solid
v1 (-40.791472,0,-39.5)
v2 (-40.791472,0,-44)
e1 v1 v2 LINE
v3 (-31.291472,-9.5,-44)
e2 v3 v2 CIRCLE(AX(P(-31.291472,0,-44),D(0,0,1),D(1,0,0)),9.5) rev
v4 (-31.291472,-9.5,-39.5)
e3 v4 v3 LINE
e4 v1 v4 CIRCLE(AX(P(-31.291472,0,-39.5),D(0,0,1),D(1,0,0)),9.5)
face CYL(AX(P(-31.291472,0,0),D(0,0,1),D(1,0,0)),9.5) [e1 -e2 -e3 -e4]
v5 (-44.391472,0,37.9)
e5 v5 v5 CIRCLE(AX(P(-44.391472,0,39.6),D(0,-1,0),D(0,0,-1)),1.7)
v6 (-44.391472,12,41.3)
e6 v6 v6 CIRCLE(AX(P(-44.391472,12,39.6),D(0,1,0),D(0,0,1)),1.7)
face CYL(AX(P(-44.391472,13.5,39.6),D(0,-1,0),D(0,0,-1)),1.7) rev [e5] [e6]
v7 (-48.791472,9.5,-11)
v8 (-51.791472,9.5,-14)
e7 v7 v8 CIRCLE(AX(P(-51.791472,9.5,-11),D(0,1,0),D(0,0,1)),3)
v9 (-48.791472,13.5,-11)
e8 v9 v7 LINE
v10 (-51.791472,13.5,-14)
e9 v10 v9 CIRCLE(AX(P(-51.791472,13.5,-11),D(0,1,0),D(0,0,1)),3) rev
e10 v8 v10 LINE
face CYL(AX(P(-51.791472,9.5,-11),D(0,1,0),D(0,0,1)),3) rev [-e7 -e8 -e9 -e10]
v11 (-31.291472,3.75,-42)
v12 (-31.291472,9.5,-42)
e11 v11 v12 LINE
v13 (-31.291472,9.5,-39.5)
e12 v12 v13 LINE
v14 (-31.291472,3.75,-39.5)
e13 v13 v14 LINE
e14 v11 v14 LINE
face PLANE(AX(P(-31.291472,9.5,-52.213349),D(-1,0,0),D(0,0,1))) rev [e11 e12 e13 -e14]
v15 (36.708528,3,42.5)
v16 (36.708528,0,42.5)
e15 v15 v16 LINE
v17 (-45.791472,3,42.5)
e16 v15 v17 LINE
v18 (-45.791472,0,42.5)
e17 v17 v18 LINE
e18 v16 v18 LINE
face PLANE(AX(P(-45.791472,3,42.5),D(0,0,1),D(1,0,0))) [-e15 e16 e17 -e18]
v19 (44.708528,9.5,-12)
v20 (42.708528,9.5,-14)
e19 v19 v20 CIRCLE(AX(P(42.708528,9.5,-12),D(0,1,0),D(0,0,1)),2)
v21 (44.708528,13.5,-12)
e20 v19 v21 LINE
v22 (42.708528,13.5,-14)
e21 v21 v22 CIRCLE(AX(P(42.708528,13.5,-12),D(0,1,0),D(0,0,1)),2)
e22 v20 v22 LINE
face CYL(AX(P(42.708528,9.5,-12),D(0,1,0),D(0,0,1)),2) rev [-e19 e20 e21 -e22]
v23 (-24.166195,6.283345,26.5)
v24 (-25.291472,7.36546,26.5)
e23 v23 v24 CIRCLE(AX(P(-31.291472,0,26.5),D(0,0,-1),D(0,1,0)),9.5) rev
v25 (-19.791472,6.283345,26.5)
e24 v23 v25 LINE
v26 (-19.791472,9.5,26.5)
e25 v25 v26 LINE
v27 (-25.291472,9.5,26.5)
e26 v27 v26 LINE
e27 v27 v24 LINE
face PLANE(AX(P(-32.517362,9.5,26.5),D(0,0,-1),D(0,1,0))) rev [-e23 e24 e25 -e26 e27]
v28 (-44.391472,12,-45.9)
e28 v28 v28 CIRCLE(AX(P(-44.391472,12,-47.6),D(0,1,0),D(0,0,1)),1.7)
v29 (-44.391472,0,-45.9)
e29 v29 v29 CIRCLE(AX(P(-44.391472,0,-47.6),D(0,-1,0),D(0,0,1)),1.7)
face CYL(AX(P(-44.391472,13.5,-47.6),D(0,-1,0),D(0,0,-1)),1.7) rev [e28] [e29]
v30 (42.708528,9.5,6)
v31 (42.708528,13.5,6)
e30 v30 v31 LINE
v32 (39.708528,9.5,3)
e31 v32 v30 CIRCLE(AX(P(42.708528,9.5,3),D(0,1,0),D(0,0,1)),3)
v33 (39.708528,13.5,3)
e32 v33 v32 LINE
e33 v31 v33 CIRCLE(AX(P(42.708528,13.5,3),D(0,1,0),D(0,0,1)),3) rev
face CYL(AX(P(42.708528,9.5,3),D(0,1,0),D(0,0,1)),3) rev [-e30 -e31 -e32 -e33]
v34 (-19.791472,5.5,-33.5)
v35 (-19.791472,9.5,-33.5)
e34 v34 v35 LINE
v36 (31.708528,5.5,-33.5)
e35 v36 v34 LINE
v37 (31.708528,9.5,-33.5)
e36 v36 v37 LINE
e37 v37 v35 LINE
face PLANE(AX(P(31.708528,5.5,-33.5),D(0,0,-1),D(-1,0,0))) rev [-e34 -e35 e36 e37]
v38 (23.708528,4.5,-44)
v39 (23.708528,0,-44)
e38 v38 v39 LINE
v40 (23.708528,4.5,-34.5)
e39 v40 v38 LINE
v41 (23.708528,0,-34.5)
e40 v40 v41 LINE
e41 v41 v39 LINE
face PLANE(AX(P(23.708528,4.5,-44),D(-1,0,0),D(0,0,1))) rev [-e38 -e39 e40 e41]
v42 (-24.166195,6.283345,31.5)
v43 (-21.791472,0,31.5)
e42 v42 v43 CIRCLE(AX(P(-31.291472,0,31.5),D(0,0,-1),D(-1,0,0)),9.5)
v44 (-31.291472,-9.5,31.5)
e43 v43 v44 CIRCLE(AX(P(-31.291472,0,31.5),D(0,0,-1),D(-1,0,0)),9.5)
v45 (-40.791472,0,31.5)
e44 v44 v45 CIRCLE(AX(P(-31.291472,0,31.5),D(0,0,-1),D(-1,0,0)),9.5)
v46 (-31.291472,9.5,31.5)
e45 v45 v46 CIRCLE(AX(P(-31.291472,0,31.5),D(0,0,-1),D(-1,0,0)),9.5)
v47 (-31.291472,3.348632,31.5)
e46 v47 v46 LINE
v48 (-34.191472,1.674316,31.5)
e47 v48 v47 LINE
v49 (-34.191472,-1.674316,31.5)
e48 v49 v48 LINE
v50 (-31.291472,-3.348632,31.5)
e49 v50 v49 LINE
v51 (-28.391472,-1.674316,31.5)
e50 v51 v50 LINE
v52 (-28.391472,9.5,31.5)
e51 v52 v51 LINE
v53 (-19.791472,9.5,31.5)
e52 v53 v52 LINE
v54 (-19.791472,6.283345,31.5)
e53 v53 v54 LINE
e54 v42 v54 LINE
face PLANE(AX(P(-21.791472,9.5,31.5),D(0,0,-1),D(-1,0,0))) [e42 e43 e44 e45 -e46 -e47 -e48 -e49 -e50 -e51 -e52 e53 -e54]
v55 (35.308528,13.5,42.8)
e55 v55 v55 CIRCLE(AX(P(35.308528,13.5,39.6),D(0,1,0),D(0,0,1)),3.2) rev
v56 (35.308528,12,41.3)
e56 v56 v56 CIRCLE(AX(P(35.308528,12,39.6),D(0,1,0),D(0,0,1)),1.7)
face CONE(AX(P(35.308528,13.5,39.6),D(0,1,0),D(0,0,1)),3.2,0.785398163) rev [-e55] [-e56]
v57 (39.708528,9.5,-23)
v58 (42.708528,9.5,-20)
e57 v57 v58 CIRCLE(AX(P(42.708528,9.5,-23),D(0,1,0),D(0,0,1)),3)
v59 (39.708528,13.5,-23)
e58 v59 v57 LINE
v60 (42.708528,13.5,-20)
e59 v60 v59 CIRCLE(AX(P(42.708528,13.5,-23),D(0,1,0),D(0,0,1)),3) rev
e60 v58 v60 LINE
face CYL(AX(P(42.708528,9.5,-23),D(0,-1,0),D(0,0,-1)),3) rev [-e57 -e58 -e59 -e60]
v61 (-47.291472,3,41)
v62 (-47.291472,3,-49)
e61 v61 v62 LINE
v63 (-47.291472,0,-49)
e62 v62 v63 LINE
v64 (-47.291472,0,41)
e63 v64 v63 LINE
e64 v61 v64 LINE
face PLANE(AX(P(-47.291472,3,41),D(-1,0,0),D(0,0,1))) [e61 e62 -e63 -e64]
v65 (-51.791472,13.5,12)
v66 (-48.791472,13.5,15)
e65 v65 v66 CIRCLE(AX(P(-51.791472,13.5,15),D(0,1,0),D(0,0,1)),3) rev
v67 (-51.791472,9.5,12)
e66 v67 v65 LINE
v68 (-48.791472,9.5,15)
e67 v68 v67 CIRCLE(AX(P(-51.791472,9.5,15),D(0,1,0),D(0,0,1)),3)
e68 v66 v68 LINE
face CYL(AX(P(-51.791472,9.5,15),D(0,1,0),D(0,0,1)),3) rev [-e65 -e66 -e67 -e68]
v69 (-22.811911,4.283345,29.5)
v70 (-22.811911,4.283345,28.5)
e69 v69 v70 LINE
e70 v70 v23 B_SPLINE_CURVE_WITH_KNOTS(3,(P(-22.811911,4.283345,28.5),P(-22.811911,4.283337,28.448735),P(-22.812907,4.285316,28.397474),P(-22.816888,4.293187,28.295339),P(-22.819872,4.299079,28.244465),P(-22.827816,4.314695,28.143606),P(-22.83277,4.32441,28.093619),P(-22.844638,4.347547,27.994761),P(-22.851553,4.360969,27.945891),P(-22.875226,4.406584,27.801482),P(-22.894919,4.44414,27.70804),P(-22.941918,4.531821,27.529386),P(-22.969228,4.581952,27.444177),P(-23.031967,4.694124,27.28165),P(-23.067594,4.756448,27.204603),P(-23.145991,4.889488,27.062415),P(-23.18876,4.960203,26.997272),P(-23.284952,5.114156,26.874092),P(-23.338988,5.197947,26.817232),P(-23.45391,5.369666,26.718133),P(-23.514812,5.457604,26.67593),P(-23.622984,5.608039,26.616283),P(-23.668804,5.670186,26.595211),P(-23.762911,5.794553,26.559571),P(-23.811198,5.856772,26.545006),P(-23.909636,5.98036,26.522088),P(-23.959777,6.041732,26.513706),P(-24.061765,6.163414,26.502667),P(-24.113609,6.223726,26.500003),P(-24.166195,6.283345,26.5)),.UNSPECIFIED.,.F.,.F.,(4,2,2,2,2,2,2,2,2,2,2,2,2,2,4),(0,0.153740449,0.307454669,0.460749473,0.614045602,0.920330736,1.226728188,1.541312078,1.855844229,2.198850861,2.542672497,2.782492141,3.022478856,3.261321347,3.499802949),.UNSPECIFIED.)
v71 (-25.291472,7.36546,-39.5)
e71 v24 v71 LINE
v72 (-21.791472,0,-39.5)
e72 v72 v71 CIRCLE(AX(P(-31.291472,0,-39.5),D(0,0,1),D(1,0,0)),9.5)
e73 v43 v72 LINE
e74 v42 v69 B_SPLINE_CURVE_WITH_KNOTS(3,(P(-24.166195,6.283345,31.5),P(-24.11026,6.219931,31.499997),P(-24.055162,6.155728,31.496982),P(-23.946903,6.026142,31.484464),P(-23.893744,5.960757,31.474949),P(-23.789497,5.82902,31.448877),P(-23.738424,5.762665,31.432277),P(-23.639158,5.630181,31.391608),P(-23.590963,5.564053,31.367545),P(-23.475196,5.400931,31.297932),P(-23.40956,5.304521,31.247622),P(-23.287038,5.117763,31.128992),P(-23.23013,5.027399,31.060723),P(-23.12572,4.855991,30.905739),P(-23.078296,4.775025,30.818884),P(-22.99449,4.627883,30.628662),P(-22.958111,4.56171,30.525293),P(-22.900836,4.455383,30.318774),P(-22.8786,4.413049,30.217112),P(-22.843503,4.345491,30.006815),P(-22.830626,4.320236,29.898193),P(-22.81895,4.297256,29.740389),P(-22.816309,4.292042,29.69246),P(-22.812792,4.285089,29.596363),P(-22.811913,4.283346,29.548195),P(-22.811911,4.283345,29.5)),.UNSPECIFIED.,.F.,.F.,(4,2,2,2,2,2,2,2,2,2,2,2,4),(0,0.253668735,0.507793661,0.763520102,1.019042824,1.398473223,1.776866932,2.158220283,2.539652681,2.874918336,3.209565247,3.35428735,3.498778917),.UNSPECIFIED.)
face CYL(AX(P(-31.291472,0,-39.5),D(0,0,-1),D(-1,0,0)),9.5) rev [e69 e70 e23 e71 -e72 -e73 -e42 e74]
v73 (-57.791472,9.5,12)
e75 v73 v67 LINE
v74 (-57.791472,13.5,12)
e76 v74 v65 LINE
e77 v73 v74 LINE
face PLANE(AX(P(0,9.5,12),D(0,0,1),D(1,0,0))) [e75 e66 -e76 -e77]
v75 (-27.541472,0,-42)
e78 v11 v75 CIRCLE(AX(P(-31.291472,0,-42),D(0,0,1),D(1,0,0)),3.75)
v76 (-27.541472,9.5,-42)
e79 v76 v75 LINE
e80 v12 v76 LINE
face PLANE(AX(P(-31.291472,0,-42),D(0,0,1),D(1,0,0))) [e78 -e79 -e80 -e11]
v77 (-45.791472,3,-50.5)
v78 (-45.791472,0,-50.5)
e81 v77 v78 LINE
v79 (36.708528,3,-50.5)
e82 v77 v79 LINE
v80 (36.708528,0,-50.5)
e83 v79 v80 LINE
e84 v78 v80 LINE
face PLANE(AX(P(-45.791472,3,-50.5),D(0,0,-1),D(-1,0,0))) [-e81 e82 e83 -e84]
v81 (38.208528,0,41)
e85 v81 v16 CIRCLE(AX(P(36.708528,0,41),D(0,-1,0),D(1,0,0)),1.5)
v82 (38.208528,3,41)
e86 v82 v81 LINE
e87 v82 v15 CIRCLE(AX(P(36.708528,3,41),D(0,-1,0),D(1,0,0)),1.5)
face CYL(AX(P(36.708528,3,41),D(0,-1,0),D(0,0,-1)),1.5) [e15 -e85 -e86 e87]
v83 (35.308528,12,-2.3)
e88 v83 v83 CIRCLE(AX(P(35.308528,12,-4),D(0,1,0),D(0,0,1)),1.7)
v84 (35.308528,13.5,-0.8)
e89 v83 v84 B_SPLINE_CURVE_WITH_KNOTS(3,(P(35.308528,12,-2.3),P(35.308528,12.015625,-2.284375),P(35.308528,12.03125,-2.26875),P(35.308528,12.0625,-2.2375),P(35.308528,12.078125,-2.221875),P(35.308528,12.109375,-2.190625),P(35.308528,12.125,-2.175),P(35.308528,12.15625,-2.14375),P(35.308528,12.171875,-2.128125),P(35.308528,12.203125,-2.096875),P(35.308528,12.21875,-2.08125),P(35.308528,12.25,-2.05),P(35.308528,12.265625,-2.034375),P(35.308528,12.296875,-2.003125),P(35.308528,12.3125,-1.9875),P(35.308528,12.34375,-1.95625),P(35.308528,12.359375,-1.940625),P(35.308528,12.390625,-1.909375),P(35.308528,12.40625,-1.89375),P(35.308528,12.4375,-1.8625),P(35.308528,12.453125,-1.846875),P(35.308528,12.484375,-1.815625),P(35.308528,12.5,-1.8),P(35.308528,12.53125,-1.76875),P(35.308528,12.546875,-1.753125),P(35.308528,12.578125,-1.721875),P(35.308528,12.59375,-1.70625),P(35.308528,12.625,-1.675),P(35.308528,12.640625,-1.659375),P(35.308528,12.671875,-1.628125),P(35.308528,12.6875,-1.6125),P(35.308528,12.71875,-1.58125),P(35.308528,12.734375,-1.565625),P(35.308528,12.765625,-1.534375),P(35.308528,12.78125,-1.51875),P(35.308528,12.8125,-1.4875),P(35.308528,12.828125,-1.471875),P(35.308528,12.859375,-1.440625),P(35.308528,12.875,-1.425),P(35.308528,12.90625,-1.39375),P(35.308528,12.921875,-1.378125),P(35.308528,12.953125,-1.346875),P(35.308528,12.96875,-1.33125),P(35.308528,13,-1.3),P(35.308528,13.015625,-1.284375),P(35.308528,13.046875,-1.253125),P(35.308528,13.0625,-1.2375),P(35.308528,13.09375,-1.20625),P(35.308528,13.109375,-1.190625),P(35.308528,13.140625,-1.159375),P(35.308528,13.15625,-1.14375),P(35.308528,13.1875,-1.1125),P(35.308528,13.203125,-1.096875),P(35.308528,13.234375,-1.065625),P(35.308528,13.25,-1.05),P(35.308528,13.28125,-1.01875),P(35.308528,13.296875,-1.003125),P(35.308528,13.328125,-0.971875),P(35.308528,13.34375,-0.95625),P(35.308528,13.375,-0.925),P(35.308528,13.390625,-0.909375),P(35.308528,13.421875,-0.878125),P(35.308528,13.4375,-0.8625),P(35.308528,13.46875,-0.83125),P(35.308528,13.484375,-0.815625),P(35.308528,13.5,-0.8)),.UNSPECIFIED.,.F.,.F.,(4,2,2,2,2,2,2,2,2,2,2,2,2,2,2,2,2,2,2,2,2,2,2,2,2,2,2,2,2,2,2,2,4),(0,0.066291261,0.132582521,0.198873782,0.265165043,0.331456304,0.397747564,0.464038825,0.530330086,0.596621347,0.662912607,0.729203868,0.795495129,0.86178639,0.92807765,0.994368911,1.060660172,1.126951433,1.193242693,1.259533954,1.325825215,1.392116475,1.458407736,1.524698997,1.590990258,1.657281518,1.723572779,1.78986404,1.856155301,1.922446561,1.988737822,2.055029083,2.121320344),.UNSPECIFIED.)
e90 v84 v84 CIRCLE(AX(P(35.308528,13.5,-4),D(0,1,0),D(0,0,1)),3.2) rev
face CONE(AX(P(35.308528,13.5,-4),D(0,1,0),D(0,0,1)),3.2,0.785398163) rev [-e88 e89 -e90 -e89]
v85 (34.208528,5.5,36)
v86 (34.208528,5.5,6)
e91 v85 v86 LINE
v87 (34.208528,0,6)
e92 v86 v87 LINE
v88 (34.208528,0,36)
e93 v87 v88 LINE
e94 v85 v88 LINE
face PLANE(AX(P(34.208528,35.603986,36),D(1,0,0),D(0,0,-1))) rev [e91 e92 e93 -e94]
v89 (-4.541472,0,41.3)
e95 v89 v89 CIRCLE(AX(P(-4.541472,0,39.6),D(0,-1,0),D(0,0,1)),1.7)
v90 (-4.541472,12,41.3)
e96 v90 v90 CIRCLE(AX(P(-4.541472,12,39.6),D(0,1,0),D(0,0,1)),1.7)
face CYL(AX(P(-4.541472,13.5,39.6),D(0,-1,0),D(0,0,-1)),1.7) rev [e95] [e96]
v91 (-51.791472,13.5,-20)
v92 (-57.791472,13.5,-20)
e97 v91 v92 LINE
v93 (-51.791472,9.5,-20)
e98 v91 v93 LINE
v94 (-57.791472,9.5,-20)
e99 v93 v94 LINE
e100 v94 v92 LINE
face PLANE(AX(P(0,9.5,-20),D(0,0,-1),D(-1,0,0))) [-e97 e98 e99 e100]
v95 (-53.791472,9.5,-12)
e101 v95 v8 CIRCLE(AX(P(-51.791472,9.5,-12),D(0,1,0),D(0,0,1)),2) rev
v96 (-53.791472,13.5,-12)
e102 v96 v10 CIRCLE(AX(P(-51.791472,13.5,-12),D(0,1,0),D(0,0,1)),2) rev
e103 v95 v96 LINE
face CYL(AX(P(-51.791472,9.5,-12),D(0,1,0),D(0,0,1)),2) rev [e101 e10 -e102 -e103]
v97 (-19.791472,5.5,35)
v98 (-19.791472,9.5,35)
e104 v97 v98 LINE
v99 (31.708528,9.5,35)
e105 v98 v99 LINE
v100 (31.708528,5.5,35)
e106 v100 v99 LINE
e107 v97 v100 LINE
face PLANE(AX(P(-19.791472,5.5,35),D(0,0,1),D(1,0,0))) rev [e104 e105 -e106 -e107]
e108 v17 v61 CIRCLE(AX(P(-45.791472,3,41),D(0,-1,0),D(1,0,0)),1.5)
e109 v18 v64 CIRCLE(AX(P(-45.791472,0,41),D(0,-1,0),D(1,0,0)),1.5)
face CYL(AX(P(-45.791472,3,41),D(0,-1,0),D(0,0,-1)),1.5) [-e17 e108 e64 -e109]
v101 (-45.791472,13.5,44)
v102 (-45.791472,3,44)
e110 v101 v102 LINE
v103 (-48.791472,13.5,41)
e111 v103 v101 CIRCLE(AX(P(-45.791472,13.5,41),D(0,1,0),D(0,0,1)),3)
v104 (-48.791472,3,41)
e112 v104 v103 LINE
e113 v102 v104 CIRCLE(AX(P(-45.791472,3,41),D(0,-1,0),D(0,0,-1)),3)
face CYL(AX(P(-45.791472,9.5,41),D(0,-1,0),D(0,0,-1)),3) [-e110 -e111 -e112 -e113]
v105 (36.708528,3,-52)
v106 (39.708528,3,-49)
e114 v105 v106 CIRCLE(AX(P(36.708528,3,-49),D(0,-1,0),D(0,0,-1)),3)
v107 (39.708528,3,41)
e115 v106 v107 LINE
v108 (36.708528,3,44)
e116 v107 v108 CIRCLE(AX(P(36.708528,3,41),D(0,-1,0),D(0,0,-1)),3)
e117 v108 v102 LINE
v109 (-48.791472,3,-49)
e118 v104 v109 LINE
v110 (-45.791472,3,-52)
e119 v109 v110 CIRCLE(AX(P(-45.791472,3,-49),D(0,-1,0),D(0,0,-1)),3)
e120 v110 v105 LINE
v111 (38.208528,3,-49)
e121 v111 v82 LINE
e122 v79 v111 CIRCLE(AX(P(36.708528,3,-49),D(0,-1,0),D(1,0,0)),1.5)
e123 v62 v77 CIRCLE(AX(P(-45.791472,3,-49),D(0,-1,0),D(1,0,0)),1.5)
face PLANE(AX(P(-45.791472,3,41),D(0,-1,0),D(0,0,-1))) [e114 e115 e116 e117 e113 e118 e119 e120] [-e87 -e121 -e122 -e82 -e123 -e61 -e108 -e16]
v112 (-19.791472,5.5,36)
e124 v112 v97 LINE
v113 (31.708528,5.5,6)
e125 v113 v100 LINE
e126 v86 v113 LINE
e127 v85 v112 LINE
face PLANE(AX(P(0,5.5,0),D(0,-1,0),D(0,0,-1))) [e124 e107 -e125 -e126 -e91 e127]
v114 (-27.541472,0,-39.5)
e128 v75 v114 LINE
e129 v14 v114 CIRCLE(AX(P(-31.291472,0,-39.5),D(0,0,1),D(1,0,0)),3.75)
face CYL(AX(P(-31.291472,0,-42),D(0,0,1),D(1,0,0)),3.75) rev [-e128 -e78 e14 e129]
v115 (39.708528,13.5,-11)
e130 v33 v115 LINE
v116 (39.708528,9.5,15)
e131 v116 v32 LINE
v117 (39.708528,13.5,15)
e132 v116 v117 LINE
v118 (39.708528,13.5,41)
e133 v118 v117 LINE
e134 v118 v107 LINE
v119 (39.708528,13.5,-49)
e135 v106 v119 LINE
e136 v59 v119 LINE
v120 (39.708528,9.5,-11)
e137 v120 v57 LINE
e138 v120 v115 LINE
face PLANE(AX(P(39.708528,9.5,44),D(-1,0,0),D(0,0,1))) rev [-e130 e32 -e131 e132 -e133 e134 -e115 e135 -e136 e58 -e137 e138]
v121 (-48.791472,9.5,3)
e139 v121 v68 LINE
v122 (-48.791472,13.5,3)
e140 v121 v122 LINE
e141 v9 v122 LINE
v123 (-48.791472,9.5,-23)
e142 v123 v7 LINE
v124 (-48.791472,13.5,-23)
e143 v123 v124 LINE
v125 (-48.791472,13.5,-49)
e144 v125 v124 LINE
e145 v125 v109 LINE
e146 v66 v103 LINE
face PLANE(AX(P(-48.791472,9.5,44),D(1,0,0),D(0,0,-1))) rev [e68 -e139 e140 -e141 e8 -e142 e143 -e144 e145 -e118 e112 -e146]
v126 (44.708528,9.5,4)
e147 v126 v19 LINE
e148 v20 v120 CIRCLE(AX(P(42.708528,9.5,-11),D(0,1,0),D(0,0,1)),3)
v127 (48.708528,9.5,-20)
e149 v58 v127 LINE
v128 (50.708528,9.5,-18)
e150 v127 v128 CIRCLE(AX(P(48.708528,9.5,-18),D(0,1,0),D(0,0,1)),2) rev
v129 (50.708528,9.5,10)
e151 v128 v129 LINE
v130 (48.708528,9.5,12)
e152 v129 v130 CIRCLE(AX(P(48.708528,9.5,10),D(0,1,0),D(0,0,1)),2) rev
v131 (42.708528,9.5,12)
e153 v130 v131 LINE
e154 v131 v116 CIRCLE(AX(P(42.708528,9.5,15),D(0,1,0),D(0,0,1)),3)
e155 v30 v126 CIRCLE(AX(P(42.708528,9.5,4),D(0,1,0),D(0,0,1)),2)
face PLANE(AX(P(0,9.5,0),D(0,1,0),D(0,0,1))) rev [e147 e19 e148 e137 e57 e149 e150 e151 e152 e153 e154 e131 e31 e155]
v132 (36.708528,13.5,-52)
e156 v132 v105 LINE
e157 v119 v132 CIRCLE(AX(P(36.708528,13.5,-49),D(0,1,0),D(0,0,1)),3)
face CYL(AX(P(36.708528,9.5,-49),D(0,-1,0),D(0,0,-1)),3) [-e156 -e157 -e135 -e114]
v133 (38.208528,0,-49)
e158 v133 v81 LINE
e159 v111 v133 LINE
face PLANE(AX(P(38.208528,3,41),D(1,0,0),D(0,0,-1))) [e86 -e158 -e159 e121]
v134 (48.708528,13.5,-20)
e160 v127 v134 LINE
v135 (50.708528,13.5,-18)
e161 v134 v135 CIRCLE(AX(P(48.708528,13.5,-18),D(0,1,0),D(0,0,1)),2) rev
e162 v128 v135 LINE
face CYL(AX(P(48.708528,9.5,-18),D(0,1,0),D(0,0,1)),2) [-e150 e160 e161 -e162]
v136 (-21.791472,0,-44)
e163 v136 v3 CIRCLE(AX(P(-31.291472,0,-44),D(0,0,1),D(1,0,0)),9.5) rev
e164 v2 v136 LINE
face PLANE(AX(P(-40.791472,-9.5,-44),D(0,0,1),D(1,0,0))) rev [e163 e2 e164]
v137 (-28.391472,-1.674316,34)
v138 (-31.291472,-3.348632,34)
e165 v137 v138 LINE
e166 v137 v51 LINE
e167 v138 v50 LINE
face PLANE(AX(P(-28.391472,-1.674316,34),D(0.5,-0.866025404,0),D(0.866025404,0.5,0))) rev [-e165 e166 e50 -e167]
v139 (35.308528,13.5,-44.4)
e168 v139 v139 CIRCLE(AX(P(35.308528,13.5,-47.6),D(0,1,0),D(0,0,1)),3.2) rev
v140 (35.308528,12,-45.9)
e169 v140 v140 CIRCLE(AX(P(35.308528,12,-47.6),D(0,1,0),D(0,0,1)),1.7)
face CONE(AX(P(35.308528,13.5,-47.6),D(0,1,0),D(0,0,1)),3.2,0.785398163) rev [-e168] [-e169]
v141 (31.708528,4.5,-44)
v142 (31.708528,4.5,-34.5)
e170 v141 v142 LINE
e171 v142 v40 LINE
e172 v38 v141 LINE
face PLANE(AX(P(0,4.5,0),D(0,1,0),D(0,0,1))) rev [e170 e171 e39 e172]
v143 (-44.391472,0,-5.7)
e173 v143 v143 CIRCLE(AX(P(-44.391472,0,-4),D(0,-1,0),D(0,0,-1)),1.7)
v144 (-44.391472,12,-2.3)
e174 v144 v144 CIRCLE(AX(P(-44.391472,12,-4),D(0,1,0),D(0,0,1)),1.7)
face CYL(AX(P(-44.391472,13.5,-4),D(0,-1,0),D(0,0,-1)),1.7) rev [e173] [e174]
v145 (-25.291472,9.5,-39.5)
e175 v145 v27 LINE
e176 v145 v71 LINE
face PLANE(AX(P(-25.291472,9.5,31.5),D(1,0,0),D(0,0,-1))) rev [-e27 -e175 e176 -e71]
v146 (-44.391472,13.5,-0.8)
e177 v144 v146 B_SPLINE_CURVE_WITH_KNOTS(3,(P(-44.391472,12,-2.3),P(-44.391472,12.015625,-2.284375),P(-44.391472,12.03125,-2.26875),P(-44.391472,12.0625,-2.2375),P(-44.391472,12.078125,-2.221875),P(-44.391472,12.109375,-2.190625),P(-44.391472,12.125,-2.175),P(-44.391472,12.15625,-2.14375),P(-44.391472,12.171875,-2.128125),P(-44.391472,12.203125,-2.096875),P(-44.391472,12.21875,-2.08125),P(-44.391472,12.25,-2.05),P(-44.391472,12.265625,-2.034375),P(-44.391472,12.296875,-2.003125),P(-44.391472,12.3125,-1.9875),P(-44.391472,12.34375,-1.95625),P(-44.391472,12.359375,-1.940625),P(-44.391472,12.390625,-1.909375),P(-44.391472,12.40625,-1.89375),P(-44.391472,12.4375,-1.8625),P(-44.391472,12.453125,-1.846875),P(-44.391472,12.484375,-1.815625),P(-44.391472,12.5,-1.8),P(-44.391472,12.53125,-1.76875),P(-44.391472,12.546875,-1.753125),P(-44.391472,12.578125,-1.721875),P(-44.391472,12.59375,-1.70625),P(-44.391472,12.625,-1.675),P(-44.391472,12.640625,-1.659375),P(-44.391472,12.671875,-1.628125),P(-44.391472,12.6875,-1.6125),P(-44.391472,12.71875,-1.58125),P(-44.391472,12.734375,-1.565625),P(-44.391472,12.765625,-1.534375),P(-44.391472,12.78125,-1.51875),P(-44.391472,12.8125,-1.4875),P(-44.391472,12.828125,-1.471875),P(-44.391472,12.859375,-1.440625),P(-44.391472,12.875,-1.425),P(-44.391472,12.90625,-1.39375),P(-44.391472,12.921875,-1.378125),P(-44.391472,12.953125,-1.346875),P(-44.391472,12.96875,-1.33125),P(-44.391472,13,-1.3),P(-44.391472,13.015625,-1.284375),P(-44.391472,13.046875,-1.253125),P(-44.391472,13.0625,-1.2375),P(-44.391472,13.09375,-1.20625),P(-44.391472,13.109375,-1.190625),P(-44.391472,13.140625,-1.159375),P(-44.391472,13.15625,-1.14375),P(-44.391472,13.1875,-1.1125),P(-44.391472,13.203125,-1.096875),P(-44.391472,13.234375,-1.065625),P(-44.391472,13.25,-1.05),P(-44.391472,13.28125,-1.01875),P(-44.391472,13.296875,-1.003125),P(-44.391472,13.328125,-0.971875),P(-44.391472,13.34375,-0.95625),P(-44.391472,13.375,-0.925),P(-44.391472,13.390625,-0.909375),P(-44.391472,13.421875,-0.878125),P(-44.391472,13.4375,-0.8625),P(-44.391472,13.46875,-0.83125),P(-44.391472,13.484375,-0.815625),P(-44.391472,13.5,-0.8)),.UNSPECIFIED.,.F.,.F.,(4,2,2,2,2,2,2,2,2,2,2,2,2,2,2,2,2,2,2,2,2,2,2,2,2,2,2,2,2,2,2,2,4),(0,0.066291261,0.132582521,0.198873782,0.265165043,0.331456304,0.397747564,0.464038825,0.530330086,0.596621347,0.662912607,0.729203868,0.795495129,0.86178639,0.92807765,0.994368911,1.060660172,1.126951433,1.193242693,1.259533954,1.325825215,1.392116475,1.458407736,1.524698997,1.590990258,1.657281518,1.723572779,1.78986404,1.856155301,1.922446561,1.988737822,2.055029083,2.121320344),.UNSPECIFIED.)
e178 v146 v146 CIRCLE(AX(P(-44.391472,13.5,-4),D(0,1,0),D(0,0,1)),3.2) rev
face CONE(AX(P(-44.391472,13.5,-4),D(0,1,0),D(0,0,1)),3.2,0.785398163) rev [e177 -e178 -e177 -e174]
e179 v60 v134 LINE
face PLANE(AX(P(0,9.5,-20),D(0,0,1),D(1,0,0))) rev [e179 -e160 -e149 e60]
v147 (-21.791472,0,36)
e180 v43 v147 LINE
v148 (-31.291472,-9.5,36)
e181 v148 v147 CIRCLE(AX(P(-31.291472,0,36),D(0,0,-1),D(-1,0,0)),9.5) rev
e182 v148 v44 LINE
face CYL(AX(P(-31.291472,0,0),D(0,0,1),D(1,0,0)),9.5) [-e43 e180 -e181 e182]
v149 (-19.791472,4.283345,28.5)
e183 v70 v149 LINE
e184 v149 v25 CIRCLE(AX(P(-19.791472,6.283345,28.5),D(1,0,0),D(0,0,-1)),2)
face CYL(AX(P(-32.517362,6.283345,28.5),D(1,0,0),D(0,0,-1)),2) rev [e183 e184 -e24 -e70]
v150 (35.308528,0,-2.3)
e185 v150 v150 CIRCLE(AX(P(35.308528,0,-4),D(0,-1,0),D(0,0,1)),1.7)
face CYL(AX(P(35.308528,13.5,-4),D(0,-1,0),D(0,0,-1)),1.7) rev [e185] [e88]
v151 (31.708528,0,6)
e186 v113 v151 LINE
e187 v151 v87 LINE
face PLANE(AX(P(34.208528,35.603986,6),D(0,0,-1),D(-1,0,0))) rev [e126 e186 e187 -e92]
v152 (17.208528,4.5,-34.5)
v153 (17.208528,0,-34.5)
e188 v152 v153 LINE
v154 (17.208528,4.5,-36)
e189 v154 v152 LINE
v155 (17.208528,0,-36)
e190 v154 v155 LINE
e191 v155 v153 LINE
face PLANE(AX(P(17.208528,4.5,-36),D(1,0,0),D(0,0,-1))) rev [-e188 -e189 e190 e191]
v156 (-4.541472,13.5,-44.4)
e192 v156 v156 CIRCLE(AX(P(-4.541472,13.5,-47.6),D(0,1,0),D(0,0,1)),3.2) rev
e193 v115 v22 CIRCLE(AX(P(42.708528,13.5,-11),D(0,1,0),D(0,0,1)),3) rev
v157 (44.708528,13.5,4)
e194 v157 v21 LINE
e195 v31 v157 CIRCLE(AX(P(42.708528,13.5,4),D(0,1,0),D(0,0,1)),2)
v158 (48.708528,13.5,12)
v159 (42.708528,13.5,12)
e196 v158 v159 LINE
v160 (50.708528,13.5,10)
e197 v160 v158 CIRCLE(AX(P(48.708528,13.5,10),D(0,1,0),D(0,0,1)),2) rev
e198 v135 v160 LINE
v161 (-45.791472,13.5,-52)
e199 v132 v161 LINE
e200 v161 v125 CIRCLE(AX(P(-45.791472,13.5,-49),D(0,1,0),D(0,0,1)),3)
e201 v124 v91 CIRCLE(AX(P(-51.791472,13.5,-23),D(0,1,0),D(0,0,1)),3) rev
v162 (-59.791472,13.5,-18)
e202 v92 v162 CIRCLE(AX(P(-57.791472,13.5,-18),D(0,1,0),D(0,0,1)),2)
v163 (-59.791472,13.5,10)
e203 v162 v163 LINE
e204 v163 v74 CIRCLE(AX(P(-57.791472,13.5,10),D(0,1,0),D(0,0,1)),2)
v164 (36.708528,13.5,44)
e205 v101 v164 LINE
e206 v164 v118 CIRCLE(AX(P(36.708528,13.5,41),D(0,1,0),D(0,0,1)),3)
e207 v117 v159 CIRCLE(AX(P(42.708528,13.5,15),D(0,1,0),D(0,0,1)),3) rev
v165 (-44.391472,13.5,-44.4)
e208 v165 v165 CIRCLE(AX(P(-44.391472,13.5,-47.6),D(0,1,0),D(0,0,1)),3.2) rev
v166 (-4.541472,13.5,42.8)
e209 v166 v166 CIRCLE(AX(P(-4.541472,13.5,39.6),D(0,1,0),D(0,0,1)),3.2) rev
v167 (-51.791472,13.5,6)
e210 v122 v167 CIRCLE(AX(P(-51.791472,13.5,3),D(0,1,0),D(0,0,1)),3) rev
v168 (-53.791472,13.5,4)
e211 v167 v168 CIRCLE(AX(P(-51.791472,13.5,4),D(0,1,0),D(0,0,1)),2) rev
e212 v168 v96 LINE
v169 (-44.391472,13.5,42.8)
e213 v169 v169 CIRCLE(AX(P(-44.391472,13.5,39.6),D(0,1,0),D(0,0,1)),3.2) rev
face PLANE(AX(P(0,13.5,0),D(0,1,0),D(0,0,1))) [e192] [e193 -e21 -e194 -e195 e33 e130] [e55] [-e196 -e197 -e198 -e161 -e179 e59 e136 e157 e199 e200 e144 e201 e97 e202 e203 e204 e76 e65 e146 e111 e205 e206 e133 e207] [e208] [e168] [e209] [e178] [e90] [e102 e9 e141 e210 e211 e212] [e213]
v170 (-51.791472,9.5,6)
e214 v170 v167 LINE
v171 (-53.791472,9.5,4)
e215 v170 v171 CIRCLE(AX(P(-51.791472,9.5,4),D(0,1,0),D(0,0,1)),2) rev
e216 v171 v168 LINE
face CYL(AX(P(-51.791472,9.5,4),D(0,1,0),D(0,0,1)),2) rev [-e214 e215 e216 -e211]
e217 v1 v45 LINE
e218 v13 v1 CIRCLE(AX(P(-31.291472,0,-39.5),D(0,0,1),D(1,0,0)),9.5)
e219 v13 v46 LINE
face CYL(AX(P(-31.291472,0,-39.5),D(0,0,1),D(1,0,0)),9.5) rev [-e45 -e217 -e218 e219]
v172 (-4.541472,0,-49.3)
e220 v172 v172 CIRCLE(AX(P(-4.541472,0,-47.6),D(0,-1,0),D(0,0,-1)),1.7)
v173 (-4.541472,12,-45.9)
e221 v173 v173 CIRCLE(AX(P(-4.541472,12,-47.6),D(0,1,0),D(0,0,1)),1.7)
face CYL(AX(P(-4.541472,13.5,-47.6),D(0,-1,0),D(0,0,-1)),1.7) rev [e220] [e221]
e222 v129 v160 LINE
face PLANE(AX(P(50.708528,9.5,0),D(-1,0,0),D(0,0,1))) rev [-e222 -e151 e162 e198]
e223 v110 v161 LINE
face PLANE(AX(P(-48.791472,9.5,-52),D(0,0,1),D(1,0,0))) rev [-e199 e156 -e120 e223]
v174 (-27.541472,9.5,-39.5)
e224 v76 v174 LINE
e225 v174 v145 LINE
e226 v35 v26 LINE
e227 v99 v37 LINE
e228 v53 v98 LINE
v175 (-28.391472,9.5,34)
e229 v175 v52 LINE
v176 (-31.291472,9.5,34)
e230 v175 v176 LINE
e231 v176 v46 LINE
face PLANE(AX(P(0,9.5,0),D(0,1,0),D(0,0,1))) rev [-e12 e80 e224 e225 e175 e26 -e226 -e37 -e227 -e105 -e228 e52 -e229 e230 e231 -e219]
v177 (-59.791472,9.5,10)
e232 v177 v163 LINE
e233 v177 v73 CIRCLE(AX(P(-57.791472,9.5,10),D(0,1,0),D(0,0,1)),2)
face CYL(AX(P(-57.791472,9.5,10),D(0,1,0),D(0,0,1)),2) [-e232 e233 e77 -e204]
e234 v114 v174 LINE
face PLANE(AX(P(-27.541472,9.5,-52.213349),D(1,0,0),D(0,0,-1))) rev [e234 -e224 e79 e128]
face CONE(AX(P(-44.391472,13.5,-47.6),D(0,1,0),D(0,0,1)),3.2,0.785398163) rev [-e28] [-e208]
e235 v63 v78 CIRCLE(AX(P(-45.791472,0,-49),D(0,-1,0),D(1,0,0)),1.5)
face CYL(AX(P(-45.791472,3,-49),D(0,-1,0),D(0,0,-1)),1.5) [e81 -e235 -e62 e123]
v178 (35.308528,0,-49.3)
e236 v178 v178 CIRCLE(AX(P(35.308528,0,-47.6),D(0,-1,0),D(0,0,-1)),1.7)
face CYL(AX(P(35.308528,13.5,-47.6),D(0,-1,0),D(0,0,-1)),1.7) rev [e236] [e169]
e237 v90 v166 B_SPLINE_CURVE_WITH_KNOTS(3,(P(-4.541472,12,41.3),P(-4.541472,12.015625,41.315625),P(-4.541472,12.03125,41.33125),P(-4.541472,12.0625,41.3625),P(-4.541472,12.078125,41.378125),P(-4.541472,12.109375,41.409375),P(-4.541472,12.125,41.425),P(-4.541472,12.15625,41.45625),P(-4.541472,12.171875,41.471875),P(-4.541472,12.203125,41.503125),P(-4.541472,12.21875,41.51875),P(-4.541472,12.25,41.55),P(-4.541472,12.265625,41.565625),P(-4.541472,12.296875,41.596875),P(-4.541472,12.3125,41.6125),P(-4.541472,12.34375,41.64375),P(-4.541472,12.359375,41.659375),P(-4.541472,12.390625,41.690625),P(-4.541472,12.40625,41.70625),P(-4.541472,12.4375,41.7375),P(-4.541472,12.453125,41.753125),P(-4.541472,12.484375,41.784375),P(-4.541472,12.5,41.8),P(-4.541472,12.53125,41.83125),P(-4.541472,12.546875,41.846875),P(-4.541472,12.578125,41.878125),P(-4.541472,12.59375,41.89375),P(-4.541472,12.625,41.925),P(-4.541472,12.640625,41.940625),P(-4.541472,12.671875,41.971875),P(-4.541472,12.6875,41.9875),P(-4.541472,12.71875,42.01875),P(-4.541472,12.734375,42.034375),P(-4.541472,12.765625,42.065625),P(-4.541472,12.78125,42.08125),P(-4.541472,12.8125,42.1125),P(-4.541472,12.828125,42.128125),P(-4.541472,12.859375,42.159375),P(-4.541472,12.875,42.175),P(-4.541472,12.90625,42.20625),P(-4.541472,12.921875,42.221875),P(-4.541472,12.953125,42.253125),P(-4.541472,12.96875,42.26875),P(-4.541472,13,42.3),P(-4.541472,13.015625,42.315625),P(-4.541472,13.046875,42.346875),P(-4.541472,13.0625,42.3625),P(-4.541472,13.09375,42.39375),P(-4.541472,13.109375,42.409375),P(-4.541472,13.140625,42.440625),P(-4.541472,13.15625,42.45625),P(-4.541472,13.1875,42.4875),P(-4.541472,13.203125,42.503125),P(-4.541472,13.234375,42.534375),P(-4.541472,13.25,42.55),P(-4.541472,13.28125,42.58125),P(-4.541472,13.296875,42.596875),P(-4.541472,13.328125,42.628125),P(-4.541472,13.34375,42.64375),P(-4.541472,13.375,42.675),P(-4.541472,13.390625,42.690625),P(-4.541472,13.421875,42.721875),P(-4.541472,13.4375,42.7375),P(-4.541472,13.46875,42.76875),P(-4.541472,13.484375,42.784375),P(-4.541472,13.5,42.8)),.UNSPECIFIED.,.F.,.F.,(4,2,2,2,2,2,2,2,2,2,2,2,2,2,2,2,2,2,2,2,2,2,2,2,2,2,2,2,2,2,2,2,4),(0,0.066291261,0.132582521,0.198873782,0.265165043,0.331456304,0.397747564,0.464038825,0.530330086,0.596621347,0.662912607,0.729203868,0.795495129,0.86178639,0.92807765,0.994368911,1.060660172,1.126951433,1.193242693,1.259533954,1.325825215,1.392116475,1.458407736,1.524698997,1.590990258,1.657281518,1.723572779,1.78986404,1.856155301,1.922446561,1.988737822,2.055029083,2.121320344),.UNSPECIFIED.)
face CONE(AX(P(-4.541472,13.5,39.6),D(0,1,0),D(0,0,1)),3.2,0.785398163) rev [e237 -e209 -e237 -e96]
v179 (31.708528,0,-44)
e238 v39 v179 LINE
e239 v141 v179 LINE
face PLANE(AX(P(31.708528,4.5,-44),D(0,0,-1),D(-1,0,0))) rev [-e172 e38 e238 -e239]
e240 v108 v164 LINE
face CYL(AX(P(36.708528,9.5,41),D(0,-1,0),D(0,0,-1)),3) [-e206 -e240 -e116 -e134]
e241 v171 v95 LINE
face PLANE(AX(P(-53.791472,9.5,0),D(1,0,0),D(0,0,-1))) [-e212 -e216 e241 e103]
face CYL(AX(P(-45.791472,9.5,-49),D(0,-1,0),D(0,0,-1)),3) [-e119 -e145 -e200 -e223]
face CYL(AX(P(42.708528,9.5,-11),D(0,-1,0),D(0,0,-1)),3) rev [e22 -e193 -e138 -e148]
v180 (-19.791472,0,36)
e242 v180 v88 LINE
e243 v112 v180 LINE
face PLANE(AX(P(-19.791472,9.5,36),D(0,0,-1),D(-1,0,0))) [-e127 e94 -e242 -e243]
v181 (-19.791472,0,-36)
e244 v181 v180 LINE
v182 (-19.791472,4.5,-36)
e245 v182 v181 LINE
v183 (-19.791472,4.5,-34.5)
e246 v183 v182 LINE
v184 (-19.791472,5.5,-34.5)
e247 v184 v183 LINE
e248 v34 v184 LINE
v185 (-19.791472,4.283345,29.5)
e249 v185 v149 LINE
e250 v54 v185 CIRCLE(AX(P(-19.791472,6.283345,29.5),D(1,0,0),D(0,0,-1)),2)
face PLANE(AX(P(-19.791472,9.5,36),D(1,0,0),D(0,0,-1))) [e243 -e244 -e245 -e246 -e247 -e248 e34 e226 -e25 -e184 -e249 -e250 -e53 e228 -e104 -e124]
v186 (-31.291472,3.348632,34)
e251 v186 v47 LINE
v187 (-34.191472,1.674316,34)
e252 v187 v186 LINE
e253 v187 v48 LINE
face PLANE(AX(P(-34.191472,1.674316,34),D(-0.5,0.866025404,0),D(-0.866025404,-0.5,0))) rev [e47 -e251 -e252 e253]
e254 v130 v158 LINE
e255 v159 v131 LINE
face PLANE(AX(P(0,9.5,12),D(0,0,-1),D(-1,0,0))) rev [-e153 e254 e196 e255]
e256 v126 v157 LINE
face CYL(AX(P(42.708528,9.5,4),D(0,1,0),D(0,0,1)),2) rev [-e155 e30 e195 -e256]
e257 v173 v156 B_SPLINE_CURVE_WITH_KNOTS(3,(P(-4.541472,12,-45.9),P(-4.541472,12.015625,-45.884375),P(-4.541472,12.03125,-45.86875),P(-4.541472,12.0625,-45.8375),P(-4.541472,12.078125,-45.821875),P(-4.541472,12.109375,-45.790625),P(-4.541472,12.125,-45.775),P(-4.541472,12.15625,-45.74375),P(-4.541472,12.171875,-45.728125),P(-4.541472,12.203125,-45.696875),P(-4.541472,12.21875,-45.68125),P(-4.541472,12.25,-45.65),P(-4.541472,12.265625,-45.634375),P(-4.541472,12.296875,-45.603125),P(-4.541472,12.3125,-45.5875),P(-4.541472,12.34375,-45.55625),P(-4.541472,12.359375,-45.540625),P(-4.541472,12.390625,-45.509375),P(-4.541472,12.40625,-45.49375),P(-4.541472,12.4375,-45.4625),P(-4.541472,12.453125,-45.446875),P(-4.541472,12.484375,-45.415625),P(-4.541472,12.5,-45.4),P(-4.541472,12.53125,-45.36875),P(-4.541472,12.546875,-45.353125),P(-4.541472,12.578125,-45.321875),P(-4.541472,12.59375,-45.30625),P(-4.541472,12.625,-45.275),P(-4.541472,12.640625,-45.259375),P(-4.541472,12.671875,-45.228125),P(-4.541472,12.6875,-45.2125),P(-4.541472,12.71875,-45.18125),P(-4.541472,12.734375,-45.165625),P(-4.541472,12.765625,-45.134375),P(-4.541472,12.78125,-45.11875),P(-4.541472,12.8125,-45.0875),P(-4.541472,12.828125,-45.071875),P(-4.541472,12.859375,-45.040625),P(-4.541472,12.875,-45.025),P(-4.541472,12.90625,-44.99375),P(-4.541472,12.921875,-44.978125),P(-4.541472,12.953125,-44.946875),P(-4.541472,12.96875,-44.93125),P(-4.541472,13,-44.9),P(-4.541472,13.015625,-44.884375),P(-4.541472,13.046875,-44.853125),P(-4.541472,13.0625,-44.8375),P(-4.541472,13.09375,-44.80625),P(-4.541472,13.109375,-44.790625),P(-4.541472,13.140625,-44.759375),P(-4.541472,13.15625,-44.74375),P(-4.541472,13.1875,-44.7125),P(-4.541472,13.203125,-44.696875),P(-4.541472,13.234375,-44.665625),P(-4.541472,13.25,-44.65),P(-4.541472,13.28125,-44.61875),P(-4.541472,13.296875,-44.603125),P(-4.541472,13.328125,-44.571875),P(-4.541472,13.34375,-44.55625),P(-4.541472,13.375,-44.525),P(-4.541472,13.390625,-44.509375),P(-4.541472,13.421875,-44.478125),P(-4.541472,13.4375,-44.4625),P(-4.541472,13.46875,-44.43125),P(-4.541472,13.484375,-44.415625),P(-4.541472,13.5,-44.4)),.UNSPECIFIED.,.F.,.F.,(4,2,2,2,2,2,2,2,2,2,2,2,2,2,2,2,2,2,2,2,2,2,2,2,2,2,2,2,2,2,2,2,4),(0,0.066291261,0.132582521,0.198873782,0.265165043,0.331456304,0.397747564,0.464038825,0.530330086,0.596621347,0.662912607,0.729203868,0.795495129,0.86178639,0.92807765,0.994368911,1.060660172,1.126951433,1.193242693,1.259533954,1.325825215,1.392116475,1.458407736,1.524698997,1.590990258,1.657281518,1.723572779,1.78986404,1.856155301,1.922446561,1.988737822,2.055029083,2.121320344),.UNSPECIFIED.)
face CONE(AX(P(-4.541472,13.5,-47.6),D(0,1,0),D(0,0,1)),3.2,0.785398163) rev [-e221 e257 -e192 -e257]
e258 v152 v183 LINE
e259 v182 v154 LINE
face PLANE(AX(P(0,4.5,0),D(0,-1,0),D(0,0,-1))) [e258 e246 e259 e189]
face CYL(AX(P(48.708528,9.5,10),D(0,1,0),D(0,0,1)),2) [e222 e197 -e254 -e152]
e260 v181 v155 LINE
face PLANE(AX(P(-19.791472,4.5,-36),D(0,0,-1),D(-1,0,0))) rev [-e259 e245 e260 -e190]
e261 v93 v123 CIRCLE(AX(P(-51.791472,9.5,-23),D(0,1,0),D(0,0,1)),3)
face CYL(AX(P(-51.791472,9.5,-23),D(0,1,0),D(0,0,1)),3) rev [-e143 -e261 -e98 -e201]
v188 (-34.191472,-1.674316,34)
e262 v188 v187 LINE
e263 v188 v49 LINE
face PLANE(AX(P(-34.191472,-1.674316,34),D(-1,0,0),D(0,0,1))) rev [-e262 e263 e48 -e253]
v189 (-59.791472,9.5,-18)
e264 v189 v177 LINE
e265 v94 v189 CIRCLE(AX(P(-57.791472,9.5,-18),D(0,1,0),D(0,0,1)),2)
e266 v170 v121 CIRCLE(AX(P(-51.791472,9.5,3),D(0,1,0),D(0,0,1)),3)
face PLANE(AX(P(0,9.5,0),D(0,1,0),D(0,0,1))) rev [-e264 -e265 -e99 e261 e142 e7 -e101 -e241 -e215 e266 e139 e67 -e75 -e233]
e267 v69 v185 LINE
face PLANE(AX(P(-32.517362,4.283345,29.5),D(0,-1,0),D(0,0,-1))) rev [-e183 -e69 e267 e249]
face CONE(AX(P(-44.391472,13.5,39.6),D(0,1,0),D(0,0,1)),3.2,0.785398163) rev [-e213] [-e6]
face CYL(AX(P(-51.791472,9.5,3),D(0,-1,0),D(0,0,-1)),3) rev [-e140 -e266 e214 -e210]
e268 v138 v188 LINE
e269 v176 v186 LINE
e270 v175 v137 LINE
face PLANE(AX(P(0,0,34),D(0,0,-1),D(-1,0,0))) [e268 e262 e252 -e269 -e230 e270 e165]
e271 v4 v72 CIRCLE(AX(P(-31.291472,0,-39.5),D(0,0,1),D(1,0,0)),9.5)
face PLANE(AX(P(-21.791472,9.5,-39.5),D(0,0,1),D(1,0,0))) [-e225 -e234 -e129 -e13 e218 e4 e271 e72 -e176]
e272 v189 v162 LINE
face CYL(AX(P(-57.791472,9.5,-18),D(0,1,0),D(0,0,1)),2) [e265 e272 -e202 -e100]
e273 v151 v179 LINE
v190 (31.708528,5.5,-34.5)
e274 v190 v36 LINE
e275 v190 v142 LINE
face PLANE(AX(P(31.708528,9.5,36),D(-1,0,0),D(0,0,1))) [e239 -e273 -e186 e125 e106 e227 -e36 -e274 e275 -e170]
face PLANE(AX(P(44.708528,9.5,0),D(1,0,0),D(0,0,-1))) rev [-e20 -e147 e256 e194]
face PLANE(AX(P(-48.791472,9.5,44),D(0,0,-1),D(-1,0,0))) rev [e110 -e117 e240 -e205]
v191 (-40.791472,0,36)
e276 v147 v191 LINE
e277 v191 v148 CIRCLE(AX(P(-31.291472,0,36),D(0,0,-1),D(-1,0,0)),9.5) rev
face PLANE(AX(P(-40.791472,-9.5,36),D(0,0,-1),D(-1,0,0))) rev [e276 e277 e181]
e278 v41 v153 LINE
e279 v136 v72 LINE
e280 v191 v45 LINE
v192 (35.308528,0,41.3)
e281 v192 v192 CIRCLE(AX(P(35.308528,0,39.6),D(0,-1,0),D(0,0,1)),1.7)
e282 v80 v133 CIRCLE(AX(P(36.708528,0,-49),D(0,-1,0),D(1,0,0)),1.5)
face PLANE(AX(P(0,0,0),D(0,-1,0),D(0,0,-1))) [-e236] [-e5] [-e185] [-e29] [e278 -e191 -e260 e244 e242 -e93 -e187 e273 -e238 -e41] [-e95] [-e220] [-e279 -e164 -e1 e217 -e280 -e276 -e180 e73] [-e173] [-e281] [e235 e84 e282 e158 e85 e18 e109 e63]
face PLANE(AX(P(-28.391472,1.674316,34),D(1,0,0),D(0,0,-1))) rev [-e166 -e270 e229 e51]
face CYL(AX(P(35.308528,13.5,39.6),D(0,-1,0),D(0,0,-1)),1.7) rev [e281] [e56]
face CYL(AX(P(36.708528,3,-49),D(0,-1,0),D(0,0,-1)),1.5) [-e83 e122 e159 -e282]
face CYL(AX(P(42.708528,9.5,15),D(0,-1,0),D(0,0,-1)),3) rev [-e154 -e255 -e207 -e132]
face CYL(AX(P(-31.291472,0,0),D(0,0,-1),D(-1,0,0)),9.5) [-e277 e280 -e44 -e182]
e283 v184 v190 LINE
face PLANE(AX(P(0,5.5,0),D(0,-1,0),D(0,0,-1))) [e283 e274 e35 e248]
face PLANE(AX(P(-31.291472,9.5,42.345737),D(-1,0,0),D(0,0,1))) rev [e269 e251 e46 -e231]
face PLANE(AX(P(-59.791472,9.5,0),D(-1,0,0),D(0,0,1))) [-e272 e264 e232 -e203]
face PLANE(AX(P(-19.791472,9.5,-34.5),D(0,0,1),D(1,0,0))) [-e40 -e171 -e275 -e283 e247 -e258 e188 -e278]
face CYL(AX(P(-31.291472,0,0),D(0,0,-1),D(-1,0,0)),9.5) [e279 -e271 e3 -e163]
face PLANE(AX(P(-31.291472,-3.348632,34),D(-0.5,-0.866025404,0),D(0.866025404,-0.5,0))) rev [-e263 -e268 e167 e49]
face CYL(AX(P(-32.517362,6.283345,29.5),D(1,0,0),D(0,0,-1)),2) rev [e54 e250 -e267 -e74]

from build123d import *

# Parameters (mm, degrees)
SKETCH_1_W            = 88.5
SKETCH_1_H            = 96
SKETCH_1_W_2          = 51.5
SKETCH_1_H_2          = 70.5
SKETCH_1_W_3          = 19
SKETCH_1_H_3          = 71
EXTRUDE_1_DEPTH       = 9.5
SKETCH_5_W            = 88.5
SKETCH_5_H            = 96
EXTRUDE_4_DEPTH       = 4
SKETCH_6_W            = 51.5
SKETCH_6_H            = 1
EXTRUDE_6_DEPTH       = 4
FILLET_3_R            = 9.5
SKETCH_7_W            = 8
SKETCH_7_H            = 9.5
SKETCH_7_W_2          = 37
SKETCH_7_H_2          = 1.5
CUT_EXTRUDE_1_DEPTH   = 4.5
SKETCH_8_W            = 2.5
SKETCH_8_H            = 30
CUT_EXTRUDE_2_DEPTH   = 5.5
SKETCH_9_W            = 19
SKETCH_9_H            = 4.5
EXTRUDE_7_DEPTH       = 9.5
FILLET_4_R            = 9.5
CUT_EXTRUDE_3_DEPTH   = 2.5
SKETCH_11_R           = 3.75
CUT_EXTRUDE_4_DEPTH   = 2.5
SKETCH_13_R           = 1.7
CUT_EXTRUDE_5_DEPTH   = 73.573120111
SKETCH_14_R           = 1.7
CUT_EXTRUDE_6_DEPTH   = 73.573120111
CHAMFER_1_SIZE        = 1.5
SKETCH_15_W           = 6
SKETCH_15_H           = 71
CUT_EXTRUDE_7_DEPTH   = 9.5
CUT_EXTRUDE_9_REACH   = 82.165
SKETCH_18_W           = 2.9
SKETCH_18_H           = 7.825684219
CUT_EXTRUDE_10_DEPTH  = 2.5
SKETCH_19_W           = 3.75
SKETCH_19_H           = 9.5
CUT_EXTRUDE_11_DEPTH  = 2.5
FILLET_5_R            = 3
CUT_EXTRUDE_2_2_DEPTH = 3
EXTRUDE_8_DEPTH       = 4
FILLET_6_R            = 3


with BuildPart() as part:
    # Эскиз1 → Бобышка-Вытянуть1 (new body)
    with BuildSketch(Plane(origin=(0, 0, 0), x_dir=(1, 0, 0), z_dir=(0, 1, 0))):
        with Locations((-4.541472233, 4)):
            Rectangle(SKETCH_1_W, SKETCH_1_H)
        with Locations((5.958527767, -0.75)):
            Rectangle(SKETCH_1_W_2, SKETCH_1_H_2, mode=Mode.SUBTRACT)
        with Locations((-31.291472233, 4)):
            Rectangle(SKETCH_1_W_3, SKETCH_1_H_3, mode=Mode.SUBTRACT)
    extrude(amount=EXTRUDE_1_DEPTH)

    # Эскиз5 → Бобышка-Вытянуть4 (add)
    with BuildSketch(Plane(origin=(0, 9.5, 0), x_dir=(1, 0, 0), z_dir=(0, 1, 0))):
        with Locations((-4.541472233, 4)):
            Rectangle(SKETCH_5_W, SKETCH_5_H)
    extrude(amount=EXTRUDE_4_DEPTH)

    # Эскиз6 → Бобышка-Вытянуть6 (add)
    with BuildSketch(Plane.XZ.offset(-9.5)):
        with Locations((5.958527767, 35.5)):
            Rectangle(SKETCH_6_W, SKETCH_6_H)
        with Locations((5.958527767, -34)):
            Rectangle(SKETCH_6_W, SKETCH_6_H)
    extrude(amount=EXTRUDE_6_DEPTH)

    # Скругление3
    fillet_3_edges = [part.edges().sort_by_distance(p)[0] for p in [
        (-40.791472233, 9.5, -4),
        (-21.791472233, 9.5, -4),
    ]]
    fillet(fillet_3_edges, radius=FILLET_3_R - 0.0001)  # a hair under: the kernel refuses the full size

    # Эскиз7 → Вырез-Вытянуть1 (cut)
    with BuildSketch(Plane.XZ):
        with Locations((27.708527767, -39.25)):
            Rectangle(SKETCH_7_W, SKETCH_7_H)
        with Locations((-1.291472233, -35.25)):
            Rectangle(SKETCH_7_W_2, SKETCH_7_H_2)
    extrude(amount=-CUT_EXTRUDE_1_DEPTH, mode=Mode.SUBTRACT)

    # Эскиз8 → Cut-Extrude 2 (cut)
    with BuildSketch(Plane.XZ):
        with Locations((32.958527767, 21)):
            Rectangle(SKETCH_8_W, SKETCH_8_H)
    extrude(amount=-CUT_EXTRUDE_2_DEPTH, mode=Mode.SUBTRACT)

    # Эскиз9 → Бобышка-Вытянуть7 (add)
    with BuildSketch(Plane.XZ):
        with Locations((-31.291472233, 33.75)):
            Rectangle(SKETCH_9_W, SKETCH_9_H)
        with Locations((-31.291472233, -41.75)):
            Rectangle(SKETCH_9_W, SKETCH_9_H)
    extrude(amount=EXTRUDE_7_DEPTH)

    # Скругление4
    fillet_4_edges = [part.edges().sort_by_distance(p)[0] for p in [
        (-21.791472233, -9.5, 33.75),
        (-21.791472233, -9.5, -41.75),
        (-40.791472233, -9.5, -41.75),
        (-40.791472233, -9.5, 33.75),
    ]]
    fillet(fillet_4_edges, radius=FILLET_4_R - 0.0001)  # a hair under: the kernel refuses the full size

    # Эскиз10 → Вырез-Вытянуть3 (cut)
    with BuildSketch(Plane(origin=(0, 0, 31.5), x_dir=(-1, 0, 0), z_dir=(0, 0, -1))):
        Polygon((31.291472233, 3.348631561), (28.391472233, 1.674315781), (28.391472233, -1.674315781), (31.291472233, -3.348631561), (34.191472233, -1.674315781), (34.191472233, 1.674315781), align=None)
    extrude(amount=-CUT_EXTRUDE_3_DEPTH, mode=Mode.SUBTRACT)

    # Эскиз11 → Вырез-Вытянуть4 (cut)
    with BuildSketch(Plane.XY.offset(-39.5)):
        with Locations((-31.291472233, 0)):
            Circle(SKETCH_11_R)
    extrude(amount=-CUT_EXTRUDE_4_DEPTH, mode=Mode.SUBTRACT)

    # Эскиз13 → Вырез-Вытянуть5 (cut, through all)
    with BuildSketch(Plane.XZ):
        with Locations(Location((35.308527767, 39.6, 0), (0, 0, 90))):
            Circle(SKETCH_13_R)
        with Locations(Location((-44.391472233, 39.6, 0), (0, 0, 270))):
            Circle(SKETCH_13_R)
        with Locations(Location((-44.391472233, -47.6, 0), (0, 0, 90))):
            Circle(SKETCH_13_R)
        with Locations(Location((35.308527767, -47.6, 0), (0, 0, 270))):
            Circle(SKETCH_13_R)
    extrude(amount=-CUT_EXTRUDE_5_DEPTH, mode=Mode.SUBTRACT)

    # Эскиз14 → Вырез-Вытянуть6 (cut, through all)
    with BuildSketch(Plane.XZ):
        with Locations(Location((-4.541472233, -47.6, 0), (0, 0, 270))):
            Circle(SKETCH_14_R)
        with Locations(Location((-4.541472233, 39.6, 0), (0, 0, 90))):
            Circle(SKETCH_14_R)
        with Locations(Location((-44.391472233, -4, 0), (0, 0, 270))):
            Circle(SKETCH_14_R)
        with Locations(Location((35.308527767, -4, 0), (0, 0, 90))):
            Circle(SKETCH_14_R)
    extrude(amount=-CUT_EXTRUDE_6_DEPTH, mode=Mode.SUBTRACT)

    # Фаска1
    chamfer_1_edges = [part.edges().sort_by_distance(p)[0] for p in [
        (-44.391472233, 13.5, 41.3),
        (35.308527767, 13.5, 37.9),
        (-44.391472233, 13.5, -49.3),
        (35.308527767, 13.5, -45.9),
        (-4.541472233, 13.5, -45.9),
        (-4.541472233, 13.5, 37.9),
        (-44.391472233, 13.5, -2.3),
        (35.308527767, 13.5, -5.7),
    ]]
    chamfer(chamfer_1_edges, length=CHAMFER_1_SIZE)

    # Эскиз15 → Вырез-Вытянуть7 (cut)
    with BuildSketch(Plane.XZ):
        with Locations((-28.291472233, -4)):
            Rectangle(SKETCH_15_W, SKETCH_15_H)
    extrude(amount=-CUT_EXTRUDE_7_DEPTH, mode=Mode.SUBTRACT)

    # Вырез-Вытянуть9: up to this face of the body (flat: up to its plane)
    cut_extrude_9_end = Plane(part.part.faces().sort_by_distance((-25.291472233, 8.432756206, -4))[0])
    # Эскиз17 → Вырез-Вытянуть9 (cut, up to the picked face)
    with BuildSketch(Plane(origin=(-19.791472233, 0, 0), x_dir=(0, 0, -1), z_dir=(1, 0, 0)), mode=Mode.PRIVATE) as cut_extrude_9_sk1:
        with BuildLine():
            Line((-31.5, 9.5), (-26.5, 9.5))
            Line((-26.5, 9.5), (-26.5, 6.283345014))
            ThreePointArc((-26.5, 6.283345014), (-27.085786438, 4.869131452), (-28.5, 4.283345014))
            Line((-28.5, 4.283345014), (-29.5, 4.283345014))
            ThreePointArc((-29.5, 4.283345014), (-30.914213562, 4.869131452), (-31.5, 6.283345014))
            Line((-31.5, 6.283345014), (-31.5, 9.5))
        make_face()
    cut_extrude_9_tool1 = split(extrude(cut_extrude_9_sk1.sketch, amount=-CUT_EXTRUDE_9_REACH, mode=Mode.PRIVATE), bisect_by=cut_extrude_9_end, keep=Keep.BOTH, mode=Mode.PRIVATE)
    add(cut_extrude_9_tool1.solids().sort_by(Axis((-19.791472, 7.043974, 29), (-1, 0, 0)))[0], mode=Mode.SUBTRACT)

    # Эскиз18 → Вырез-Вытянуть10 (cut)
    with BuildSketch(Plane(origin=(0, 0, 31.5), x_dir=(-1, 0, 0), z_dir=(0, 0, -1))):
        with Locations((29.841472233, 5.587157891)):
            Rectangle(SKETCH_18_W, SKETCH_18_H)
    extrude(amount=-CUT_EXTRUDE_10_DEPTH, mode=Mode.SUBTRACT)

    # Эскиз19 → Вырез-Вытянуть11 (cut)
    with BuildSketch(Plane.XY.offset(-39.5)):
        with Locations((-29.416472233, 4.75)):
            Rectangle(SKETCH_19_W, SKETCH_19_H)
    extrude(amount=-CUT_EXTRUDE_11_DEPTH, mode=Mode.SUBTRACT)

    # Скругление5
    fillet_5_edges = [part.edges().sort_by_distance(p)[0] for p in [
        (-48.791472233, 6.75, -52),
        (39.708527767, 6.75, -52),
        (39.708527767, 6.75, 44),
        (-48.791472233, 6.75, 44),
    ]]
    fillet(fillet_5_edges, radius=FILLET_5_R)

    # Эскиз21 → Cut-Extrude 2 2 (cut)
    with BuildSketch(Plane.XZ):
        with BuildLine():
            Line((-48.791472233, -49), (-48.791472233, 41))
            ThreePointArc((-48.791472233, 41), (-47.912792577, 43.121320344), (-45.791472233, 44))
            Line((-45.791472233, 44), (36.708527767, 44))
            ThreePointArc((36.708527767, 44), (38.82984811, 43.121320344), (39.708527767, 41))
            Line((39.708527767, 41), (39.708527767, -49))
            ThreePointArc((39.708527767, -49), (38.82984811, -51.121320344), (36.708527767, -52))
            Line((36.708527767, -52), (-45.791472233, -52))
            ThreePointArc((-45.791472233, -52), (-47.912792577, -51.121320344), (-48.791472233, -49))
        make_face()
        with BuildLine():
            Line((-47.291472233, -49), (-47.291472233, 41))
            ThreePointArc((-47.291472233, 41), (-46.852132405, 42.060660172), (-45.791472233, 42.5))
            Line((-45.791472233, 42.5), (36.708527767, 42.5))
            ThreePointArc((36.708527767, 42.5), (37.769187939, 42.060660172), (38.208527767, 41))
            Line((38.208527767, 41), (38.208527767, -49))
            ThreePointArc((38.208527767, -49), (37.769187939, -50.060660172), (36.708527767, -50.5))
            Line((36.708527767, -50.5), (-45.791472233, -50.5))
            ThreePointArc((-45.791472233, -50.5), (-46.852132405, -50.060660172), (-47.291472233, -49))
        make_face(mode=Mode.SUBTRACT)
    extrude(amount=-CUT_EXTRUDE_2_2_DEPTH, mode=Mode.SUBTRACT)

    # Эскиз22 → Бобышка-Вытянуть8 (add)
    with BuildSketch(Plane(origin=(0, 13.5, 0), x_dir=(1, 0, 0), z_dir=(0, 1, 0))):
        with BuildLine():
            Line((-48.791472233, -6), (-51.791472233, -6))
            ThreePointArc((-51.791472233, -6), (-53.205685795, -5.414213562), (-53.791472233, -4))
            Line((-53.791472233, -4), (-53.791472233, 12))
            ThreePointArc((-53.791472233, 12), (-53.205685795, 13.414213562), (-51.791472233, 14))
            Line((-51.791472233, 14), (-48.791472233, 14))
            Line((-48.791472233, 14), (-48.791472233, 20))
            Line((-48.791472233, 20), (-57.791472233, 20))
            ThreePointArc((-57.791472233, 20), (-59.205685795, 19.414213562), (-59.791472233, 18))
            Line((-59.791472233, 18), (-59.791472233, -10))
            ThreePointArc((-59.791472233, -10), (-59.205685795, -11.414213562), (-57.791472233, -12))
            Line((-57.791472233, -12), (-48.791472233, -12))
            Line((-48.791472233, -12), (-48.791472233, -6))
        make_face()
        with BuildLine():
            Line((39.708527767, -6), (39.708527767, -12))
            Line((39.708527767, -12), (48.708527767, -12))
            ThreePointArc((48.708527767, -12), (50.122741329, -11.414213562), (50.708527767, -10))
            Line((50.708527767, -10), (50.708527767, 18))
            ThreePointArc((50.708527767, 18), (50.122741329, 19.414213562), (48.708527767, 20))
            Line((48.708527767, 20), (39.708527767, 20))
            Line((39.708527767, 20), (39.708527767, 14))
            Line((39.708527767, 14), (42.708527767, 14))
            ThreePointArc((42.708527767, 14), (44.122741329, 13.414213562), (44.708527767, 12))
            Line((44.708527767, 12), (44.708527767, -4))
            ThreePointArc((44.708527767, -4), (44.122741329, -5.414213562), (42.708527767, -6))
            Line((42.708527767, -6), (39.708527767, -6))
        make_face()
    extrude(amount=-EXTRUDE_8_DEPTH)

    # Скругление6
    fillet_6_edges = [part.edges().sort_by_distance(p)[0] for p in [
        (-48.791472233, 11.5, -14),
        (-48.791472233, 11.5, 6),
        (-48.791472233, 11.5, -20),
        (-48.791472233, 11.5, 12),
        (39.708527767, 11.5, 6),
        (39.708527767, 11.5, -14),
        (39.708527767, 11.5, 12),
        (39.708527767, 11.5, -20),
    ]]
    fillet(fillet_6_edges, radius=FILLET_6_R - 0.0001)  # a hair under: the kernel refuses the full size


solid = part.part
